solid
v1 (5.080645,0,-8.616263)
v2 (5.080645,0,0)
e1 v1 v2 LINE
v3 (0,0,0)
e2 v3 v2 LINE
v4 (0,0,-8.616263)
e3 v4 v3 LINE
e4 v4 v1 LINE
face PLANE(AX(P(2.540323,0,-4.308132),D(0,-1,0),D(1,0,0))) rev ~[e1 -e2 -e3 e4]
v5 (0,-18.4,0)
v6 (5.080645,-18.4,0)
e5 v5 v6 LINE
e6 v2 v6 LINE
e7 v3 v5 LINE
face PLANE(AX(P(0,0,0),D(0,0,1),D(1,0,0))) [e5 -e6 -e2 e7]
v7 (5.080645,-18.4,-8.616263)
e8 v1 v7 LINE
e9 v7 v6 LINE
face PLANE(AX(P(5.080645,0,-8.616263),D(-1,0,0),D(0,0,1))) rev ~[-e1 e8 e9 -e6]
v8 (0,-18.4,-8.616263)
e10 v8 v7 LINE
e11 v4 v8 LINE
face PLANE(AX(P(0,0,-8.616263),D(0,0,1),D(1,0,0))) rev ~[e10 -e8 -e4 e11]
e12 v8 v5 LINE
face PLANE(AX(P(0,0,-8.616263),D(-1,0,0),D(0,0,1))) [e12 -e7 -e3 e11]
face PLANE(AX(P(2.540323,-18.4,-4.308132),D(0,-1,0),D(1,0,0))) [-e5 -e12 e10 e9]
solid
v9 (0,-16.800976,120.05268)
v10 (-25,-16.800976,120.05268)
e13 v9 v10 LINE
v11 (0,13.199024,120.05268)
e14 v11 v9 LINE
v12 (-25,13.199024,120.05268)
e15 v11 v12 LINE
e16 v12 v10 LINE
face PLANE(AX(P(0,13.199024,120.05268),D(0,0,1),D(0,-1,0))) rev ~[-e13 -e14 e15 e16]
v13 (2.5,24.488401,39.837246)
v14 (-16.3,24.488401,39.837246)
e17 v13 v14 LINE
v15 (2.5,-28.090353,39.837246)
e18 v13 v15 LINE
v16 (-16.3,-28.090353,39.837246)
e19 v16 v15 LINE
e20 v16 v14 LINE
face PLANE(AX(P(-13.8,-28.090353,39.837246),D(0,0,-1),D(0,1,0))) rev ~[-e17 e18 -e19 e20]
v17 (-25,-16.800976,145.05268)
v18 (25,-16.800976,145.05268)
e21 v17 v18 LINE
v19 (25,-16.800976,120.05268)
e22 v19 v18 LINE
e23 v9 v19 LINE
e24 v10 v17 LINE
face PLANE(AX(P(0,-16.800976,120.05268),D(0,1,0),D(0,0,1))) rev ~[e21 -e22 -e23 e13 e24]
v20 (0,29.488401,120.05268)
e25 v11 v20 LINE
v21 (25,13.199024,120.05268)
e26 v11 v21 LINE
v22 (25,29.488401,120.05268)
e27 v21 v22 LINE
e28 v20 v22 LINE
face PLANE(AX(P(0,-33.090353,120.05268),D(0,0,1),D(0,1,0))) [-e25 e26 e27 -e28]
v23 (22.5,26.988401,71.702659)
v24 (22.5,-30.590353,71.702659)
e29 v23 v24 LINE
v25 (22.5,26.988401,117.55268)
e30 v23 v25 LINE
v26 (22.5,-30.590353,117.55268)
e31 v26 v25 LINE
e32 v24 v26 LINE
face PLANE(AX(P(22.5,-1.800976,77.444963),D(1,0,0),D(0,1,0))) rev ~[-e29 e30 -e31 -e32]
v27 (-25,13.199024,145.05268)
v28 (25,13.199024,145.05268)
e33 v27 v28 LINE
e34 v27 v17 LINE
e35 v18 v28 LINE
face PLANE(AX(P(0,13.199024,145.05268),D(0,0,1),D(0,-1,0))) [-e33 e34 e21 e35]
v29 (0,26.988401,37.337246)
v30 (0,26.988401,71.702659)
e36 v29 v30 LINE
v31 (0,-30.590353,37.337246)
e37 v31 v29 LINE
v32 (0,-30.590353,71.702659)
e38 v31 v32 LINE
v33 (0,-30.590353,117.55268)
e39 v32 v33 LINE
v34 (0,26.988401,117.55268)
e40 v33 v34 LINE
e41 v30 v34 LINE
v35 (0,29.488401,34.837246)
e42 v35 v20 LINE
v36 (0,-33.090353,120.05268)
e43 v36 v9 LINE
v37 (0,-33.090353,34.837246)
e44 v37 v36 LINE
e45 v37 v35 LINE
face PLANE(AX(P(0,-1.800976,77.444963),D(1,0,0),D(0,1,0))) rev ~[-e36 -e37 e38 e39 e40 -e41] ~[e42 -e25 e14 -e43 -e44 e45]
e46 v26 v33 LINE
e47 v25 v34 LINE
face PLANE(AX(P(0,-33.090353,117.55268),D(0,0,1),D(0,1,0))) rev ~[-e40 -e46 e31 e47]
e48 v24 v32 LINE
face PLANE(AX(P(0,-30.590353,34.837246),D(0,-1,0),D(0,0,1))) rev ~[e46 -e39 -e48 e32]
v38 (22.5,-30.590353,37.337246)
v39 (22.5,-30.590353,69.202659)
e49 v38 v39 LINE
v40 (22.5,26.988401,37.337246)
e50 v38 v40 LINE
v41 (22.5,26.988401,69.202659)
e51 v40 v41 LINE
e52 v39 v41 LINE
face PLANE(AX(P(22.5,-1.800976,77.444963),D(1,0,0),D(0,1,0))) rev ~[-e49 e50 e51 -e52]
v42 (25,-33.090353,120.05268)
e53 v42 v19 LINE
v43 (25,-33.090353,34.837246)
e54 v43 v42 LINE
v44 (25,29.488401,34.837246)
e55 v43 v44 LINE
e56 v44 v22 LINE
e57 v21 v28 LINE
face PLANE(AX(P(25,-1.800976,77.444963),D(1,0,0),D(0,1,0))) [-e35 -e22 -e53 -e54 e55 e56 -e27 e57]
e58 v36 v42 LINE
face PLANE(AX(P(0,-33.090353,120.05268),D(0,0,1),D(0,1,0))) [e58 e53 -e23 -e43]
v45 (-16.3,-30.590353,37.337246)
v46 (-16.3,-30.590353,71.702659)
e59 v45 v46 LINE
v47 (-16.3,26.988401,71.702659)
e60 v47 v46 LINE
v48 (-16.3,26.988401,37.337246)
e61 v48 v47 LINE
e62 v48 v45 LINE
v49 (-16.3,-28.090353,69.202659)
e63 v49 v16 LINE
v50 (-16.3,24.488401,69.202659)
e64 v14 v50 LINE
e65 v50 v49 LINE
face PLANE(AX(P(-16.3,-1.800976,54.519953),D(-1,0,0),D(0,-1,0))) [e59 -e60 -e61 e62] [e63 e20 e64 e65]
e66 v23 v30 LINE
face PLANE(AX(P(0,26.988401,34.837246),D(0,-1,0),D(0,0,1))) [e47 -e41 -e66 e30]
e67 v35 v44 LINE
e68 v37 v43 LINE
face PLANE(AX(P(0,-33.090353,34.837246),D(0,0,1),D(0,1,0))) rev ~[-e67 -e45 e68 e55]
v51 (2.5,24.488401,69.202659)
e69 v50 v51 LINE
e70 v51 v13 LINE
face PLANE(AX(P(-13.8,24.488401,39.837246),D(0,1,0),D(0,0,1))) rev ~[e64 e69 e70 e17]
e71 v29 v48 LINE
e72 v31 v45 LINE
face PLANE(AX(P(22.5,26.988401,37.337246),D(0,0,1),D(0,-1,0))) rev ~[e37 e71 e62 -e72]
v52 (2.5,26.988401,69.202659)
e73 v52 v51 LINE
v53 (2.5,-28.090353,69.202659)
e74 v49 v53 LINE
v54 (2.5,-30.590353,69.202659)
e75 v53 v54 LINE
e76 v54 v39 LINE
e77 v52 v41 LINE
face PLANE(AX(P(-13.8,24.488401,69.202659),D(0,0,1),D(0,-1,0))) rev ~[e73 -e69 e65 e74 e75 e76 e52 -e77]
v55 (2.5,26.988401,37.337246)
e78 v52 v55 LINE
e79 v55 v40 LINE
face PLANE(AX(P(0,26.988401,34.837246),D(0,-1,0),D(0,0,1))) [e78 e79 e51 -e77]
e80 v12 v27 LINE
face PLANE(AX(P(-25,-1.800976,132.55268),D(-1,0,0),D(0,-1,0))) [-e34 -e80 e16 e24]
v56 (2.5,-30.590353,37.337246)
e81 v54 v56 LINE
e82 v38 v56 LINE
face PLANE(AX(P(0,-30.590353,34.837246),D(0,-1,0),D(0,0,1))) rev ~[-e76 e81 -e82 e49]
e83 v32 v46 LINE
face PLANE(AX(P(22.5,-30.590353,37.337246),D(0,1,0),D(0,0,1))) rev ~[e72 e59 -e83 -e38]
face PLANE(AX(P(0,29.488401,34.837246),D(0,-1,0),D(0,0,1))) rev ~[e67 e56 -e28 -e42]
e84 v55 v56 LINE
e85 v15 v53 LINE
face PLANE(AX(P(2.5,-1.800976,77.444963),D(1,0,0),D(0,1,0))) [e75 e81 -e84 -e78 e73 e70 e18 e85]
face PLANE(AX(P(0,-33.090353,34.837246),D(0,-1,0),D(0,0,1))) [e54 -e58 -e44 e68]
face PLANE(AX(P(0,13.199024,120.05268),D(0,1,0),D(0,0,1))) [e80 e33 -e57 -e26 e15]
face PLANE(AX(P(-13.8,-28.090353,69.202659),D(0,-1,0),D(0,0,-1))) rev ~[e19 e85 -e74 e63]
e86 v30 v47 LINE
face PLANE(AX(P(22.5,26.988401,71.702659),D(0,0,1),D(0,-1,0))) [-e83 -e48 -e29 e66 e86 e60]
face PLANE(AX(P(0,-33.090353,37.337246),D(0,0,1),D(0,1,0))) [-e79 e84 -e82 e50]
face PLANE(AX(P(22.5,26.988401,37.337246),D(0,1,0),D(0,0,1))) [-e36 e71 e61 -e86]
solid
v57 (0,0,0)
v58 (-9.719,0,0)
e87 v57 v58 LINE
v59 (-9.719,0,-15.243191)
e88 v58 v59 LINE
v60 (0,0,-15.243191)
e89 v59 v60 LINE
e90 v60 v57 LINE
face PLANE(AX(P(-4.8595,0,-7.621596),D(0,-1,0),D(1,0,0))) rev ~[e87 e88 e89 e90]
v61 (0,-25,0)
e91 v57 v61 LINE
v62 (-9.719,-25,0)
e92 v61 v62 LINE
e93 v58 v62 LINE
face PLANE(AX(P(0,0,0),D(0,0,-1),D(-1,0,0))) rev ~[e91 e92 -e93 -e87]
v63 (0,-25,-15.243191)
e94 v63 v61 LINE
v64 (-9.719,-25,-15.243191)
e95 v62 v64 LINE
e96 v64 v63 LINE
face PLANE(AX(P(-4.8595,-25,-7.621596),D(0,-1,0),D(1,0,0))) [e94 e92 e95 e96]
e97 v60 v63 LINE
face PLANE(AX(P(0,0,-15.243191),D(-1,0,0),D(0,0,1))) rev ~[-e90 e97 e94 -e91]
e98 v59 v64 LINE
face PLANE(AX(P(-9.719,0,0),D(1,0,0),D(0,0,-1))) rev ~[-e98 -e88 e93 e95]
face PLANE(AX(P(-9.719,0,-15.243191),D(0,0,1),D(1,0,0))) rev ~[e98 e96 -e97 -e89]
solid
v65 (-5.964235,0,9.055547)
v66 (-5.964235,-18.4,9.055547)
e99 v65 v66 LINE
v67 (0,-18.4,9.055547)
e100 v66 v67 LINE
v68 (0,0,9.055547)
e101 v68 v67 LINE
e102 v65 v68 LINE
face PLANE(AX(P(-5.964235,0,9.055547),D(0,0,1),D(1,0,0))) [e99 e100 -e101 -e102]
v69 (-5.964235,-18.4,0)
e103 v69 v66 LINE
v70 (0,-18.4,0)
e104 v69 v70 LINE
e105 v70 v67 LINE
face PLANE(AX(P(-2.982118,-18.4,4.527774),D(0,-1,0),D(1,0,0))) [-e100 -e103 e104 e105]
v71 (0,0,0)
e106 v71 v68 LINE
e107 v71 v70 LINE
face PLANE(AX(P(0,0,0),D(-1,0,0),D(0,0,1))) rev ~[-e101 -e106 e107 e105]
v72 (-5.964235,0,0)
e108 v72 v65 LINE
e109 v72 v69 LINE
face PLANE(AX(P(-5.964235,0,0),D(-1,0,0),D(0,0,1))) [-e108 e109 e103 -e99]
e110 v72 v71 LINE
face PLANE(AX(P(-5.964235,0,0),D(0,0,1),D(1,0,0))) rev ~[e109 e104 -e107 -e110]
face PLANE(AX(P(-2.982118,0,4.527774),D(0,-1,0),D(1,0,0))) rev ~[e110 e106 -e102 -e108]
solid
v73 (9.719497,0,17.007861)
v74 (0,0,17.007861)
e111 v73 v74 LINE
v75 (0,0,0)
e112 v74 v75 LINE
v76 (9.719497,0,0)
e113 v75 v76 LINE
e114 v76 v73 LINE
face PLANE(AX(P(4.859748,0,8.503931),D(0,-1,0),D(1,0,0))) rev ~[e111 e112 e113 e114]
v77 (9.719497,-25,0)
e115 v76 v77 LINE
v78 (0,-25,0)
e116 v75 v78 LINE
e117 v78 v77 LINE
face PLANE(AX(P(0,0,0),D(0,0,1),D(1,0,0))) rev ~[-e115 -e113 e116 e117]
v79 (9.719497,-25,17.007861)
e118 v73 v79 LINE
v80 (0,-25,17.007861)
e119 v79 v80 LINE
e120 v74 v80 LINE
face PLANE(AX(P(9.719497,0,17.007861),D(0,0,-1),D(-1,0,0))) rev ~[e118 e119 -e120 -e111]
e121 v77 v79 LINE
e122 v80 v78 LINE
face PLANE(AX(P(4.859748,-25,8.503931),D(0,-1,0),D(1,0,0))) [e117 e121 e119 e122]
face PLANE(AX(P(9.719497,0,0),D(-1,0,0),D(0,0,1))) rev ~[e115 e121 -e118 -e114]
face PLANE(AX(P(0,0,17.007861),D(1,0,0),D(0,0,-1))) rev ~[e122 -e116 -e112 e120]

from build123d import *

# Parameters (mm, degrees)
F1_DEPTH  = 25
F0_W      = 5.9642354026
F0_H      = 9.0555474162
F2_DEPTH  = 18.4
F0_W_2    = 5.0806454383
F0_H_2    = 8.6162630469
F3_W      = 62.5787544996
F3_H      = 85.215434432
F4_DEPTH  = 25
F5_T      = -2.5
F6_W      = 57.5787544996
F6_H      = 34.3654131889
F7_DEPTH  = 38.8
F8_T      = -2.5
F9_W      = 25
F9_H      = 15
F10_DEPTH = 25
F11_W     = 30
F11_H     = 25
F12_DEPTH = 25


# Not quite as in the source:
# - a shell that OpenCascade refuses in one call is made with other operations: the cavity is built on its own and cut out


with BuildPart() as f1:
    # F0 (on Front) → F1 (new body)
    with BuildSketch(Plane.XZ):
        Polygon((0, 9.0555474162), (0, 0), (5.0806454383, 0), (9.7194965929, 0), (9.7194965929, 17.0078612864), (0, 17.0078612864), align=None)
    extrude(amount=F1_DEPTH)


with BuildPart() as f1b:
    # F0 (on Front) → F1, piece 2 (new body)
    with BuildSketch(Plane.XZ):
        Polygon((0, -8.6162630469), (0, 0), (-5.9642354026, 0), (-9.719, 0), (-9.719, -15.243191272), (0, -15.243191272), align=None)
    extrude(amount=F1_DEPTH)


with BuildPart() as f2:
    # F0 (on Front) → F2 (new body)
    with BuildSketch(Plane.XZ):
        with Locations((-2.9821177013, 4.5277737081)):
            Rectangle(F0_W, F0_H)
    extrude(amount=F2_DEPTH)


with BuildPart() as f2b:
    # F0 (on Front) → F2, piece 2 (new body)
    with BuildSketch(Plane.XZ):
        with Locations((2.5403227191, -4.3081315234)):
            Rectangle(F0_W_2, F0_H_2)
    extrude(amount=F2_DEPTH)


with BuildPart() as f4:
    # F3 (on Right) → F4 (new body)
    with BuildSketch(Plane.YZ):
        with Locations((-1.8009757623, 77.4449631572)):
            Rectangle(F3_W, F3_H)
    extrude(amount=F4_DEPTH)

    # F5
    f5_openings = [f4.faces().sort_by_distance(p)[0] for p in [
        (0, -1.800976, 77.444963),
    ]]
    offset(amount=F5_T, openings=f5_openings)

    # F6 (on face) → F7 (join)
    with BuildSketch(Plane(origin=(22.5, 0, 0), x_dir=(0, -1, 0), z_dir=(-1, 0, 0))):
        with Locations((1.8009757623, 54.5199525356)):
            Rectangle(F6_W, F6_H)
    extrude(amount=F7_DEPTH)

    # F8: a shell. OpenCascade refuses it in one call, so the cavity is built on its own and cut out:
    # the body offset inwards by the wall thickness, plus a prism from it out through each open face.
    f8_core = offset(f4.part, amount=F8_T, kind=Kind.INTERSECTION, mode=Mode.PRIVATE)
    f8_exits = [f8_core.faces().sort_by_distance(p)[0] for p in [
        (-13.8, -1.800976, 54.519953),
    ]]
    add(f8_core, mode=Mode.SUBTRACT)
    extrude(f8_exits, amount=-F8_T, mode=Mode.SUBTRACT)

    # F9 (on face) → F10 (join)
    with BuildSketch(Plane.XY.offset(120.0526803732)):
        with Locations((12.5, -9.3009757623)):
            Rectangle(F9_W, F9_H)
        with Locations((12.5, 5.6990242377)):
            Rectangle(F9_W, F9_H)
    extrude(amount=F10_DEPTH)

    # F11 (on face) → F12 (join)
    with BuildSketch(Plane(origin=(0, 0, 0), x_dir=(0, -1, 0), z_dir=(-1, 0, 0))):
        with Locations((1.8009757623, 132.5526803732)):
            Rectangle(F11_W, F11_H)
    extrude(amount=F12_DEPTH)


solid = Compound([f1.part, f1b.part, f2.part, f2b.part, f4.part])
